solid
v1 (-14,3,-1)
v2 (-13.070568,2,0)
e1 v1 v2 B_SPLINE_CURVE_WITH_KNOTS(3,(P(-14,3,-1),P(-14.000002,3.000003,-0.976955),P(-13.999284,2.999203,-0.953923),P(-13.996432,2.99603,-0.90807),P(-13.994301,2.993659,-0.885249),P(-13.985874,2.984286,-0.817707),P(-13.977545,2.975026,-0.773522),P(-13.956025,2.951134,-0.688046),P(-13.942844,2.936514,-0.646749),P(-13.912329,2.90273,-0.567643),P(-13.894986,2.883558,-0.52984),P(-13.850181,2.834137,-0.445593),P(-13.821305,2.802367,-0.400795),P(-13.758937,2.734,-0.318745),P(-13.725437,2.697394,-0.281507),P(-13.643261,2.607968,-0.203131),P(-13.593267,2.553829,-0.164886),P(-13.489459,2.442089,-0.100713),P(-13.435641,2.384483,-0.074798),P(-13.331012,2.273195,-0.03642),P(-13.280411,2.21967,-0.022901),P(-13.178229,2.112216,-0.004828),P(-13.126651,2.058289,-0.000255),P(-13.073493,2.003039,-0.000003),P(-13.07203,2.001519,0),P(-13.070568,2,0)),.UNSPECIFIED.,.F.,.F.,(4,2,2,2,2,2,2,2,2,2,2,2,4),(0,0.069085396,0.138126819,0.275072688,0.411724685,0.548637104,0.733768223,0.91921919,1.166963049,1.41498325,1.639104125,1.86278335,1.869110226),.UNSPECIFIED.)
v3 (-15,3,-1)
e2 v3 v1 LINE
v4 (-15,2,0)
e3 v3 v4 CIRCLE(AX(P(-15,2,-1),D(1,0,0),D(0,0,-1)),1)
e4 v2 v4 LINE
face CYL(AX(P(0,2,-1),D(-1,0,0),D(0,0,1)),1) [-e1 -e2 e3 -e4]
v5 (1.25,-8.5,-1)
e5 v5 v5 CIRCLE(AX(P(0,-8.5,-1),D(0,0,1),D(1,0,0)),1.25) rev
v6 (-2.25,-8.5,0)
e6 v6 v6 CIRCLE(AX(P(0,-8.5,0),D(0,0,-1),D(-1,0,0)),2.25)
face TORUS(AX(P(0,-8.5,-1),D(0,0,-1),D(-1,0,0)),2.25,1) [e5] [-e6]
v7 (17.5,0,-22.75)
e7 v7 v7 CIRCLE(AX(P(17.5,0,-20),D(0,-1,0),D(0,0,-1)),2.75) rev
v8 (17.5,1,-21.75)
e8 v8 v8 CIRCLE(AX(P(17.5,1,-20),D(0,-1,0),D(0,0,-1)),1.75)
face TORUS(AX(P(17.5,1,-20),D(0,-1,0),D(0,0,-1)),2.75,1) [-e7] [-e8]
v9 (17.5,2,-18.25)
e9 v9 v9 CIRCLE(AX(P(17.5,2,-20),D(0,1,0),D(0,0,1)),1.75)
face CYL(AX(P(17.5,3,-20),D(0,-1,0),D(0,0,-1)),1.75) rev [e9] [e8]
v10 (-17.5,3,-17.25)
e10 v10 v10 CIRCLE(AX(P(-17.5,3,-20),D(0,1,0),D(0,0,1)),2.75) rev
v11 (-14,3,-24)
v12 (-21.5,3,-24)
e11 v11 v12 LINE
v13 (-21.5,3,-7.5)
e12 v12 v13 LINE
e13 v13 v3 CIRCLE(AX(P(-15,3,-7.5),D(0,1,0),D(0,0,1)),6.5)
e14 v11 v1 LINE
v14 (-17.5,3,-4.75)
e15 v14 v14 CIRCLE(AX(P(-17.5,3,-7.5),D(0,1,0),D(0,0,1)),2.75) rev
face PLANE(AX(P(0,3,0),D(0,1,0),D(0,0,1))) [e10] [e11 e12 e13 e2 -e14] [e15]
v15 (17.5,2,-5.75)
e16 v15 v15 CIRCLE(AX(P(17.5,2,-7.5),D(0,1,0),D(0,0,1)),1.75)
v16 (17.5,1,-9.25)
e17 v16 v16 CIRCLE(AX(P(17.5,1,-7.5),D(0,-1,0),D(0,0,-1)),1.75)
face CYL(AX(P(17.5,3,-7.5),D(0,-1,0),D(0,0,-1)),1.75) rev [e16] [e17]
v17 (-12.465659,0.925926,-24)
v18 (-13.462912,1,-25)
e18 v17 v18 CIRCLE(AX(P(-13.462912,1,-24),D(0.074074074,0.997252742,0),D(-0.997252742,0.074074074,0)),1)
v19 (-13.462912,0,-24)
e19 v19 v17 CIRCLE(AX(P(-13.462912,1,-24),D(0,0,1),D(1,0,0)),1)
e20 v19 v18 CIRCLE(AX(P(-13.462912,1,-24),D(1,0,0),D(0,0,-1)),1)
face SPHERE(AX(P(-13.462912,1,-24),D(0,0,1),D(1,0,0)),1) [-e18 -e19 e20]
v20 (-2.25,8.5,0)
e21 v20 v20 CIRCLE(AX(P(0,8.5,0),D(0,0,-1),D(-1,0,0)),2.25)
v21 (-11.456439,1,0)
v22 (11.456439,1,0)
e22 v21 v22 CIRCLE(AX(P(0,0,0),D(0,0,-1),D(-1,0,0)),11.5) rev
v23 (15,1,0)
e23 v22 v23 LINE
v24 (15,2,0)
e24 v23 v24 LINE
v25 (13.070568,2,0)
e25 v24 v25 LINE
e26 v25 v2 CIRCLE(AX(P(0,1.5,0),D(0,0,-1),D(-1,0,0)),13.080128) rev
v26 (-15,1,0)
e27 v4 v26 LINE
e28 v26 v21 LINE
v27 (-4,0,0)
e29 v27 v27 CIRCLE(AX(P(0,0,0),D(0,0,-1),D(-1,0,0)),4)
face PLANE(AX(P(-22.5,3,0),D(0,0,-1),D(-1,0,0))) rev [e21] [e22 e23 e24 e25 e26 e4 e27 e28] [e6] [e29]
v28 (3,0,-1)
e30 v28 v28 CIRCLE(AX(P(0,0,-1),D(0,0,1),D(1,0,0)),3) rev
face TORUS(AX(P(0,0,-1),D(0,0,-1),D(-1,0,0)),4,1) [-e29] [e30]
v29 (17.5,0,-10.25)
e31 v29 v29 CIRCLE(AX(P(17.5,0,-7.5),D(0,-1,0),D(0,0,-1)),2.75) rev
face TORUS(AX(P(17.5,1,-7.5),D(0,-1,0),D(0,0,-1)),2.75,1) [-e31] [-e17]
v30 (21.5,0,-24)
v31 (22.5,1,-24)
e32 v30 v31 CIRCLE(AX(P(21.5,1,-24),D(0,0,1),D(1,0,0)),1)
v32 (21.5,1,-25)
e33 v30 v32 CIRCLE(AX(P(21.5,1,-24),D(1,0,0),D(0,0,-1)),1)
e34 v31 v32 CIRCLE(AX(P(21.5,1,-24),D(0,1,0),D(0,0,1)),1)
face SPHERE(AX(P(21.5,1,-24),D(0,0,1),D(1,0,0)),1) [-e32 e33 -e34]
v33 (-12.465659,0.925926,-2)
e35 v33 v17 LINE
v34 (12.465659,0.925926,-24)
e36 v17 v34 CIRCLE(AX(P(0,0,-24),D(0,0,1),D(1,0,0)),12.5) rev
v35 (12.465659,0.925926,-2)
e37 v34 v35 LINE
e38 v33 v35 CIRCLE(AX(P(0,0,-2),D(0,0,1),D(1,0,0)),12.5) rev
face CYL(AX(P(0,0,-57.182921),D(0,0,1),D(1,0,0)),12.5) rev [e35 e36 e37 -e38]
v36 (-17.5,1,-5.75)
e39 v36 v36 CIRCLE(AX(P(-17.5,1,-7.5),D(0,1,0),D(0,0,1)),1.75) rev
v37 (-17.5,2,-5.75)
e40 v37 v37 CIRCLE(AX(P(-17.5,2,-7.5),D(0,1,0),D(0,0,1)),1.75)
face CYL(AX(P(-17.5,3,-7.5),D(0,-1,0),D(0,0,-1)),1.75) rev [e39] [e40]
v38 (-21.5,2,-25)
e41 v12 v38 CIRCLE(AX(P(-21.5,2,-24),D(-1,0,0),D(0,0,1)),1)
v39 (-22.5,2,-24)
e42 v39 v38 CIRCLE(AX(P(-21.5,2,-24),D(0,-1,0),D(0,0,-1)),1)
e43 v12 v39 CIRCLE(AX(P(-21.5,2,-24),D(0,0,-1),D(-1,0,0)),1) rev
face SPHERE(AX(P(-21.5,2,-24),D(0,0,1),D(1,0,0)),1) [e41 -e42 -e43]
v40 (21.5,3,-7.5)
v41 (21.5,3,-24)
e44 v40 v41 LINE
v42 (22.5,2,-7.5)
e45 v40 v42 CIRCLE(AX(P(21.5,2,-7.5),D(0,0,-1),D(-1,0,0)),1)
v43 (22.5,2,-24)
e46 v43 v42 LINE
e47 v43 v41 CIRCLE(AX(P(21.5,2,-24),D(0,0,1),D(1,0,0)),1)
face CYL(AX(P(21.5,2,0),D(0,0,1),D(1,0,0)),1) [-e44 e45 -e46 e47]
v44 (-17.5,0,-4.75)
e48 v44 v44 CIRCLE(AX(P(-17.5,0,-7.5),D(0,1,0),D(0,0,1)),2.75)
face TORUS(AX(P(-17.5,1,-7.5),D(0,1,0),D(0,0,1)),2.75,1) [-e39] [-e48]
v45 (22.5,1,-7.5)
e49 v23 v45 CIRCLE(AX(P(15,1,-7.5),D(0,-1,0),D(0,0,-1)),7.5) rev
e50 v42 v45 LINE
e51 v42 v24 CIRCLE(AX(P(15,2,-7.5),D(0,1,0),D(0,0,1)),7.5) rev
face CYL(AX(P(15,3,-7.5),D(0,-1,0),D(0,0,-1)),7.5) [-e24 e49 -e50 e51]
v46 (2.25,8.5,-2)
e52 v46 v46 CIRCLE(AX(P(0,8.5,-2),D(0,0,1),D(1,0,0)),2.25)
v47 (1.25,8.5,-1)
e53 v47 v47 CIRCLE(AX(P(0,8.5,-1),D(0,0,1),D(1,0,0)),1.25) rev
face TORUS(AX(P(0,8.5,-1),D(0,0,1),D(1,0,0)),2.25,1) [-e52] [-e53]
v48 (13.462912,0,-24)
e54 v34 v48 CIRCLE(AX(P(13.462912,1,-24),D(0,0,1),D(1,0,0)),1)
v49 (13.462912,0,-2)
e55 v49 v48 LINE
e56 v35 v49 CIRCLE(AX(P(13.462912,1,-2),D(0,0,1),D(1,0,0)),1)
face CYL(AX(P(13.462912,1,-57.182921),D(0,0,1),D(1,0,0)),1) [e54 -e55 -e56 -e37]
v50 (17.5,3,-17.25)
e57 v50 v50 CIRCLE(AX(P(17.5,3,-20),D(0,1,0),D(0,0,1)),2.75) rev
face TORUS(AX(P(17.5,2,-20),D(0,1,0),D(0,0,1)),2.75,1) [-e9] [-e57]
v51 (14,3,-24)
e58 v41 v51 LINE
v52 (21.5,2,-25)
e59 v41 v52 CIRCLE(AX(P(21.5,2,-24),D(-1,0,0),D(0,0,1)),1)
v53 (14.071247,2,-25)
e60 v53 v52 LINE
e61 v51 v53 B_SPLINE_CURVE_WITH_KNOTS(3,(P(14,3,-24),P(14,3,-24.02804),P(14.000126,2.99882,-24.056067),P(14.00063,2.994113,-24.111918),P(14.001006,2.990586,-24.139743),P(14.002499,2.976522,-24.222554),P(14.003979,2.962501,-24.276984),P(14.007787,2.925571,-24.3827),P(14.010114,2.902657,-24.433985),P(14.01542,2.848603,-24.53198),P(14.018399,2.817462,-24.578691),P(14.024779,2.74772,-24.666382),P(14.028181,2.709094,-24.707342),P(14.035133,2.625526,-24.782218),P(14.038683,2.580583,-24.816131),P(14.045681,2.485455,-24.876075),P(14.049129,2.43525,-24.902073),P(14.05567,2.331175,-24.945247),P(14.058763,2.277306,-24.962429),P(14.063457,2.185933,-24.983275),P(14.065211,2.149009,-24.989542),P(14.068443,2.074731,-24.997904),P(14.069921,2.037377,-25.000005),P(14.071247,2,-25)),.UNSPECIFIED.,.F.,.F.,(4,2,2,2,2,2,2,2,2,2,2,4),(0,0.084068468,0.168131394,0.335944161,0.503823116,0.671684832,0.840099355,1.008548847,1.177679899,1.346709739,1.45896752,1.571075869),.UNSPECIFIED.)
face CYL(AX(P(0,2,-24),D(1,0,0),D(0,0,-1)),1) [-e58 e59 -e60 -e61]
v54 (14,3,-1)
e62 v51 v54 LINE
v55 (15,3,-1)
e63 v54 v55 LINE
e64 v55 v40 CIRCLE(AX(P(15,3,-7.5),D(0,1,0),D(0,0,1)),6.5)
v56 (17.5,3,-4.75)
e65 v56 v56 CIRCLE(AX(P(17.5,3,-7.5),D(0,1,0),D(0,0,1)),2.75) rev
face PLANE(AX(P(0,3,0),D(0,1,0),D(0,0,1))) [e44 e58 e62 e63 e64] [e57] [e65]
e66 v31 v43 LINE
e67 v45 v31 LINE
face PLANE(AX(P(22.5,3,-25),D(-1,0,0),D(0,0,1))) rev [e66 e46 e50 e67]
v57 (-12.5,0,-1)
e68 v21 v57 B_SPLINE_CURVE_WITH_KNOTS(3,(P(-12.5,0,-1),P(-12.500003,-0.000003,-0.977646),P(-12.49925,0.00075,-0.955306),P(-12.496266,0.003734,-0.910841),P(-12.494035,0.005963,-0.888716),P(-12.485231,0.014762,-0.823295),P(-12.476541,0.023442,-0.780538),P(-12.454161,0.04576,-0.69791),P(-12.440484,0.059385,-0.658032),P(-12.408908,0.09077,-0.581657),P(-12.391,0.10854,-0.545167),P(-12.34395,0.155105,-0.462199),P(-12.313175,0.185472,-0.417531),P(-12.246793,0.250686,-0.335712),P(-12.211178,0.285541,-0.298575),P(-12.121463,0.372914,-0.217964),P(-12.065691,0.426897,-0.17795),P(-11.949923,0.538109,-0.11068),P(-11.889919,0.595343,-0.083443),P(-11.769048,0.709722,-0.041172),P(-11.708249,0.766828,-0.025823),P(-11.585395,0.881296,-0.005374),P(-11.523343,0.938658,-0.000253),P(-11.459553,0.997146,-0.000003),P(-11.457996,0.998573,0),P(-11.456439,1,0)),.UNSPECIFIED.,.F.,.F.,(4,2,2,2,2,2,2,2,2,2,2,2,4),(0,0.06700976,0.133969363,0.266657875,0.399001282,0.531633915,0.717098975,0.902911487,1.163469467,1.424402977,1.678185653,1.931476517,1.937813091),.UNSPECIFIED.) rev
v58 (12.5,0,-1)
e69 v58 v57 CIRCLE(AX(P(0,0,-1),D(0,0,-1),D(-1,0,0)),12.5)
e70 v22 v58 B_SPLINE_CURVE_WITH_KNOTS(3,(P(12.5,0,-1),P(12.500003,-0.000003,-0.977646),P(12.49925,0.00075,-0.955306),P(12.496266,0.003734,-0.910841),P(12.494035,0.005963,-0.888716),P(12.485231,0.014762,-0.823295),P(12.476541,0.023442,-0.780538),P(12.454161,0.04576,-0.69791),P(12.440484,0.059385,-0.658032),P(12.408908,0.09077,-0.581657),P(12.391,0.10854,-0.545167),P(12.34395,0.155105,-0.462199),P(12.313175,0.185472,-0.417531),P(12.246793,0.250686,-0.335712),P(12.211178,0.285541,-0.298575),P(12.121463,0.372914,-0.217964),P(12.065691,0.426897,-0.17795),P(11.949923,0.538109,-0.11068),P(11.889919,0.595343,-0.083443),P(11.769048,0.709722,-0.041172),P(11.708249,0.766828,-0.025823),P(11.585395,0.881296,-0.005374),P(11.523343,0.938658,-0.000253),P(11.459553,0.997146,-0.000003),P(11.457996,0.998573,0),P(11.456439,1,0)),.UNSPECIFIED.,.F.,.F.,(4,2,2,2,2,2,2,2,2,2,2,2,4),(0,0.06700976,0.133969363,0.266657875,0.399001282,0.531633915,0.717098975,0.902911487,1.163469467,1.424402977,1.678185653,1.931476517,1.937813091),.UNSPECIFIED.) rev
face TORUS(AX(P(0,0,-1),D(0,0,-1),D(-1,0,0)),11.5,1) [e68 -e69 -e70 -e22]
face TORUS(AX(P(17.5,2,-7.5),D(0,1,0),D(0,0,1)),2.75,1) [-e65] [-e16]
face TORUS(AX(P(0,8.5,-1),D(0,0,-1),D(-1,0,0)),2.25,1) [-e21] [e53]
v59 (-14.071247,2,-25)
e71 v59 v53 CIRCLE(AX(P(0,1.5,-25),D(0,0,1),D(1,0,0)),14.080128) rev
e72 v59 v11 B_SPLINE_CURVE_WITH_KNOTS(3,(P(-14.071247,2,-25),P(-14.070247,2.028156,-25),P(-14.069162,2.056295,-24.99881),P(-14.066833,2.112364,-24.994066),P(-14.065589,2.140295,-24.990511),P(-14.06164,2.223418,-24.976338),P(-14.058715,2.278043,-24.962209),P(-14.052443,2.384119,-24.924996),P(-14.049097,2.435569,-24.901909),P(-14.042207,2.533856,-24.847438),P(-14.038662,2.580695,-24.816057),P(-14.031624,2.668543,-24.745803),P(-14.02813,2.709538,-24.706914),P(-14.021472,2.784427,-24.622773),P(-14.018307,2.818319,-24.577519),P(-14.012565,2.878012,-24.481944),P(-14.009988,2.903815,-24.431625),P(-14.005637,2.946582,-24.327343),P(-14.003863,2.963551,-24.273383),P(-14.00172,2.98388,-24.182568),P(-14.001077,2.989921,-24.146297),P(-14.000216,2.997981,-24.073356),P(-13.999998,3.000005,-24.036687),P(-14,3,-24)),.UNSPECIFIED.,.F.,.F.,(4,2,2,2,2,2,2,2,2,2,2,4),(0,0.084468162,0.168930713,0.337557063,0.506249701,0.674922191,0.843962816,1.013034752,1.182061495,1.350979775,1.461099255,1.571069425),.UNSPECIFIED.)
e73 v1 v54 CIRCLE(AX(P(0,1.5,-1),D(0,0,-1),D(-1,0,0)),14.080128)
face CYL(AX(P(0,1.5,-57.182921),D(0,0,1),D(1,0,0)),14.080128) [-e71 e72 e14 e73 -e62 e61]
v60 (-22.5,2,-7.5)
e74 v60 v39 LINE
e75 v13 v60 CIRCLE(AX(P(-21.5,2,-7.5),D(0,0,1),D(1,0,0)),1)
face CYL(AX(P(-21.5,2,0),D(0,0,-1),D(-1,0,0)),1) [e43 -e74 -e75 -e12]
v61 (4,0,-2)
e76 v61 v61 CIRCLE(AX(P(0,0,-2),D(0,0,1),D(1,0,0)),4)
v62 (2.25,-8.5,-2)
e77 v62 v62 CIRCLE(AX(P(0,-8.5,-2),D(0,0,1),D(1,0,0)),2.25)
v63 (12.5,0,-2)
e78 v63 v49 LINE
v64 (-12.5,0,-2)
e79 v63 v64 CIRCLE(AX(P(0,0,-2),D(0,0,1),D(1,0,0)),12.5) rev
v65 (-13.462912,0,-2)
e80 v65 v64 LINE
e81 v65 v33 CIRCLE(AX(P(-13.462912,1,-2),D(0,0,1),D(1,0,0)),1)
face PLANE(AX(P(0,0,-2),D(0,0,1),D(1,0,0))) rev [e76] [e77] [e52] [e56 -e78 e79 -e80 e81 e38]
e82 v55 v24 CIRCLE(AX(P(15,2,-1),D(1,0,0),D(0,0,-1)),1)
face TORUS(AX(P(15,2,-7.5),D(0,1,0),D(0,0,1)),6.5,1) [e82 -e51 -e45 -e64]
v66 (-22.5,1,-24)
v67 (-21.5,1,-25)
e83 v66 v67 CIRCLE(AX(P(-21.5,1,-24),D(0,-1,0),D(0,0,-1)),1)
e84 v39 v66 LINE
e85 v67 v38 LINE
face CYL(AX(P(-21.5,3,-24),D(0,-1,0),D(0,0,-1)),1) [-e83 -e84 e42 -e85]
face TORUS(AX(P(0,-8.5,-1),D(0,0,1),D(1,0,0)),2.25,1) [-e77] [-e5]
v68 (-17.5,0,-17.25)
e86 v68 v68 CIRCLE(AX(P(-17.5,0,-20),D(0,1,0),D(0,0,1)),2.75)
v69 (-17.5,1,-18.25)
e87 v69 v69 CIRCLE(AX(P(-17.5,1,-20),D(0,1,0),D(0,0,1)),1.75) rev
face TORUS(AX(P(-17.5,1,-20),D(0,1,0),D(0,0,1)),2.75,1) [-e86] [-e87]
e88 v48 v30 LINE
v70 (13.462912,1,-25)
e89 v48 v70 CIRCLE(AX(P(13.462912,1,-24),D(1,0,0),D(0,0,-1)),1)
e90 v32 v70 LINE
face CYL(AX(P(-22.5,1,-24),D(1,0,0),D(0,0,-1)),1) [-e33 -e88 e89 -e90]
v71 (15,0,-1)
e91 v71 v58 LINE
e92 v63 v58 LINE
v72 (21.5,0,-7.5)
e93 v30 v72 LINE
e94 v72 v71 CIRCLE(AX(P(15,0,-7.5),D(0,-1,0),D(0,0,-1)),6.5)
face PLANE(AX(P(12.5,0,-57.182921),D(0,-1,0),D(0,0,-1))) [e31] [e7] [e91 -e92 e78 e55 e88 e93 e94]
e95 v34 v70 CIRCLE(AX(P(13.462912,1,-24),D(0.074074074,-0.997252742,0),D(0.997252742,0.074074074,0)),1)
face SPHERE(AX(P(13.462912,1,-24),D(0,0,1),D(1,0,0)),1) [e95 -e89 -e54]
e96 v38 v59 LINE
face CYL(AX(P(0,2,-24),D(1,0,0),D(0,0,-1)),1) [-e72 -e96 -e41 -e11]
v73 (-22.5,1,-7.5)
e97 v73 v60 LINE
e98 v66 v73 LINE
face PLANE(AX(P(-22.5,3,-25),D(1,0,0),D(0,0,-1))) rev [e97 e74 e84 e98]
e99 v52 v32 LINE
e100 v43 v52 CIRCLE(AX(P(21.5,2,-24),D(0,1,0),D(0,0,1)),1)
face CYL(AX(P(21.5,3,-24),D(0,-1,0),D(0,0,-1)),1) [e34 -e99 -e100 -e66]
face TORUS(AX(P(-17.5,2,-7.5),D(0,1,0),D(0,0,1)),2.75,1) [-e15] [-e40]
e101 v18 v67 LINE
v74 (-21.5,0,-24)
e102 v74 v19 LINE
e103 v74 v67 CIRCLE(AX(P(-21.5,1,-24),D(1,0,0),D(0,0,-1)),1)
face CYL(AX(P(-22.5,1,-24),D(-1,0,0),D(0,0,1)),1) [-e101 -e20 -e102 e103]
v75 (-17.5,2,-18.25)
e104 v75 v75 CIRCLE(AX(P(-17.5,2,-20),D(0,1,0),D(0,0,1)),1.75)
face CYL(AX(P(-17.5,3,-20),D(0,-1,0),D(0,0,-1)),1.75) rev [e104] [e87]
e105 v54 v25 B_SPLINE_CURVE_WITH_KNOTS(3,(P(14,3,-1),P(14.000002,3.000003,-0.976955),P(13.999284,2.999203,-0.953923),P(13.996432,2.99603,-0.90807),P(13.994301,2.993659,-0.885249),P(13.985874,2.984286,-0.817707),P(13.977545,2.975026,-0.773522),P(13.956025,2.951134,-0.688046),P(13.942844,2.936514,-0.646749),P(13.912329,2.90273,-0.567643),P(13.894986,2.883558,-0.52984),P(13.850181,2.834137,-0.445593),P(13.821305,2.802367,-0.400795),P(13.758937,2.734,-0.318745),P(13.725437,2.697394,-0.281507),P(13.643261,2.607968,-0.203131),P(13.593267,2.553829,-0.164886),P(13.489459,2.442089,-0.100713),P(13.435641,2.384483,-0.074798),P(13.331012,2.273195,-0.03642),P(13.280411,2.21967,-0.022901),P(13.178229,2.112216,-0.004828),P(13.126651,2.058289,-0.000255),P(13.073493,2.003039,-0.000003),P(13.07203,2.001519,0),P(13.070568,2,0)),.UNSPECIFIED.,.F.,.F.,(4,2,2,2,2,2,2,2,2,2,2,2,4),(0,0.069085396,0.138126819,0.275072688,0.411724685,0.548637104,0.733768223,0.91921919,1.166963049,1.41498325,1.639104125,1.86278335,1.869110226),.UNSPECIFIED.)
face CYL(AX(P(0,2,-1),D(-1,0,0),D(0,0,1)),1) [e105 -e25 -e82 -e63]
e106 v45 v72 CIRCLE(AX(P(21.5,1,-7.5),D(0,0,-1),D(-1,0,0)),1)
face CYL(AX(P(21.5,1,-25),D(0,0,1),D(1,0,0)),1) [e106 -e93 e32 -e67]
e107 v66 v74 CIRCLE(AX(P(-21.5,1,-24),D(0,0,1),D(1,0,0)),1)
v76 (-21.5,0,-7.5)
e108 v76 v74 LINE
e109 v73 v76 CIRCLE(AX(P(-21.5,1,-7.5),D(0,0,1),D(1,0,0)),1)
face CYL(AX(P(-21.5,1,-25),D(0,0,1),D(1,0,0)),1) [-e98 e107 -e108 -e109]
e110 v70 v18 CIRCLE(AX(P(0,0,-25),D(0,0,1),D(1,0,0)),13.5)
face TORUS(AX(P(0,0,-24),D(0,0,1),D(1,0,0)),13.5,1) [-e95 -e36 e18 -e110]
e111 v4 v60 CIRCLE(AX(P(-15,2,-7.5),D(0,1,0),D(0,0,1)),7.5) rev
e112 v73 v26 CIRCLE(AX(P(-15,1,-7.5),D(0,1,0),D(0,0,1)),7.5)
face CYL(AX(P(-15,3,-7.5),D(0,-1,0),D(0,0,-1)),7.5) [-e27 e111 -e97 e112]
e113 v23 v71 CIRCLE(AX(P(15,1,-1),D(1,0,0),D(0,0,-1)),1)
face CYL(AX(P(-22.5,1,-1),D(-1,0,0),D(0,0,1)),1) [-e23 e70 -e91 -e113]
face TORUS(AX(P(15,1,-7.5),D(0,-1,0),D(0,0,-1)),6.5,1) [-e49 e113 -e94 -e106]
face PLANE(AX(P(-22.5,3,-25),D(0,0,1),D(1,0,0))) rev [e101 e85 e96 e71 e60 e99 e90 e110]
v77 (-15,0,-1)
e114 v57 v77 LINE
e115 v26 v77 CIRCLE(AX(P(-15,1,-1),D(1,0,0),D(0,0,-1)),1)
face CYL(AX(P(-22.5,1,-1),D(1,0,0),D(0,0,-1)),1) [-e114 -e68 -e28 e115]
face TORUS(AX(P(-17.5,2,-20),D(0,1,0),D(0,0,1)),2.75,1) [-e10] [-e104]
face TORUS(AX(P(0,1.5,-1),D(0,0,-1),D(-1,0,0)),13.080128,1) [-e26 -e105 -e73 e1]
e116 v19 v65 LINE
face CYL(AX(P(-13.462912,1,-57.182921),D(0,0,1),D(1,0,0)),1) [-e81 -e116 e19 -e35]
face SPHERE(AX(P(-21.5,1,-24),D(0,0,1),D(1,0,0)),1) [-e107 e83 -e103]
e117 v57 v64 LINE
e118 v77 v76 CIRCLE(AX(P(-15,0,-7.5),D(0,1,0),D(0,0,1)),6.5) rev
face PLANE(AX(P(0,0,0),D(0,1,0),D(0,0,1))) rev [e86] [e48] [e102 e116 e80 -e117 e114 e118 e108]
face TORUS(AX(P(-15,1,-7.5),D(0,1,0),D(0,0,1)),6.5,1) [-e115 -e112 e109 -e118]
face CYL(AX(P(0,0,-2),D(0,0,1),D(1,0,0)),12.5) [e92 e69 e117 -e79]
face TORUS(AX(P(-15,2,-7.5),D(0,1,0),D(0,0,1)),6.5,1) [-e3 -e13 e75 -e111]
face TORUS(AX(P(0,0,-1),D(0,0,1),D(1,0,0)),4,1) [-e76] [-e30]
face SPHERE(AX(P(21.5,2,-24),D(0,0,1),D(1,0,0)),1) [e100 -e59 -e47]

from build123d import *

# Parameters (mm, degrees)
SKETCH1_W             = 10
SKETCH1_H             = 25
SKETCH1_R             = 1.75
BOSS_EXTRUDE1_DEPTH   = 3
BOSS_EXTRUDE1_2_DEPTH = 3
BOSS_EXTRUDE2_DEPTH   = 25
SKETCH3_R             = 12.5
SKETCH3_R_2           = 1.25
SKETCH3_R_3           = 3
BOSS_EXTRUDE3_DEPTH   = 2
FILLET1_R             = 7.5
FILLET2_R             = 1
FILLET3_R             = 1


with BuildPart() as part:
    # Sketch1 → Boss-Extrude1 (new body)
    with BuildSketch(Plane(origin=(0, 0, 0), x_dir=(1, 0, 0), z_dir=(0, 1, 0))):
        with Locations((-17.5, 12.5)):
            Rectangle(SKETCH1_W, SKETCH1_H)
        with Locations(Location((-17.5, 20, 0), (0, 0, 270))):
            Circle(SKETCH1_R, mode=Mode.SUBTRACT)
        with Locations(Location((-17.5, 7.5, 0), (0, 0, 270))):
            Circle(SKETCH1_R, mode=Mode.SUBTRACT)
    extrude(amount=BOSS_EXTRUDE1_DEPTH)



with BuildPart() as body_2:
    # Sketch1 → Boss-Extrude1 2 (new body)
    with BuildSketch(Plane(origin=(0, 0, 0), x_dir=(1, 0, 0), z_dir=(0, 1, 0))):
        with Locations((17.5, 12.5)):
            Rectangle(SKETCH1_W, SKETCH1_H)
        with Locations(Location((17.5, 20, 0), (0, 0, 270))):
            Circle(SKETCH1_R, mode=Mode.SUBTRACT)
        with Locations(Location((17.5, 7.5, 0), (0, 0, 270))):
            Circle(SKETCH1_R, mode=Mode.SUBTRACT)
    extrude(amount=BOSS_EXTRUDE1_2_DEPTH)


with BuildPart() as part_1:
    add(part.part)

    add(body_2.part)  # Boss-Extrude2 merges body 2
    # Sketch2 → Boss-Extrude2 (add)
    with BuildSketch(Plane.XY):
        with BuildLine():
            Line((-14, 0), (-12.5, 0))
            ThreePointArc((-12.5, 0), (0, 12.5), (12.5, 0))
            Line((12.5, 0), (14, 0))
            ThreePointArc((14, 0), (0, 15.58012784), (-14, 0))
        make_face()
    extrude(amount=-BOSS_EXTRUDE2_DEPTH)

    # Sketch3 → Boss-Extrude3 (add)
    with BuildSketch(Plane.XY):
        Circle(SKETCH3_R)
        with Locations((0, 8.5)):
            Circle(SKETCH3_R_2, mode=Mode.SUBTRACT)
        with Locations((0, -8.5)):
            Circle(SKETCH3_R_2, mode=Mode.SUBTRACT)
        Circle(SKETCH3_R_3, mode=Mode.SUBTRACT)
    extrude(amount=-BOSS_EXTRUDE3_DEPTH)

    # Fillet1
    fillet1_edges = [part_1.edges().sort_by_distance(p)[0] for p in [
        (22.5, 1.5, 0),
        (-22.5, 1.5, 0),
    ]]
    fillet(fillet1_edges, radius=FILLET1_R)

    # Fillet2
    fillet2_edges = [part_1.edges().sort_by_distance(p)[0] for p in [
        (-17.5, 0, -21.75),
        (-17.5, 3, -21.75),
        (-17.5, 0, -9.25),
        (-17.5, 3, -9.25),
        (12.5, 0, -13.5),
        (13.75, 0, 0),
        (0, 15.58012784, 0),
        (14.5, 3, 0),
        (17.5, 0, -21.75),
        (17.5, 0, -9.25),
        (17.5, 3, -21.75),
        (17.5, 3, -9.25),
        (-22.5, 3, -16.25),
        (-12.5, 0, -13.5),
        (0, -12.5, 0),
        (-1.25, 8.5, 0),
        (-1.25, -8.5, 0),
        (-3, 0, 0),
        (-22.5, 0, -16.25),
        (-3, 0, -2),
        (-1.25, -8.5, -2),
        (-1.25, 8.5, -2),
        (-14.5, 3, 0),
        (-13.75, 0, 0),
        (-20.303300859, 0, -2.196699141),
        (-20.303300859, 3, -2.196699141),
        (22.5, 0, -16.25),
        (22.5, 3, -16.25),
        (20.303300859, 0, -2.196699141),
        (20.303300859, 3, -2.196699141),
    ]]
    fillet(fillet2_edges, radius=FILLET2_R - 0.0001)  # a hair under: the kernel refuses the full size

    # Fillet3
    fillet3_edges = [part_1.edges().sort_by_distance(p)[0] for p in [
        (22.207136071, 0.292863929, -25),
        (22.207136071, 2.707136071, -25),
        (-17.75005, 3, -25),
        (17.75005, 3, -25),
        (22.5, 1.5, -25),
        (17.481459585, 0, -25),
        (0, 12.5, -25),
        (-17.481459585, 0, -25),
        (-22.5, 1.5, -25),
        (12.782470874, 0.267147514, -25),
        (-12.782470874, 0.267147514, -25),
        (-22.207136071, 2.707136071, -25),
        (-22.207136071, 0.292863929, -25),
    ]]
    fillet(fillet3_edges, radius=FILLET3_R - 0.0001)  # a hair under: the kernel refuses the full size


solid = part_1.part
